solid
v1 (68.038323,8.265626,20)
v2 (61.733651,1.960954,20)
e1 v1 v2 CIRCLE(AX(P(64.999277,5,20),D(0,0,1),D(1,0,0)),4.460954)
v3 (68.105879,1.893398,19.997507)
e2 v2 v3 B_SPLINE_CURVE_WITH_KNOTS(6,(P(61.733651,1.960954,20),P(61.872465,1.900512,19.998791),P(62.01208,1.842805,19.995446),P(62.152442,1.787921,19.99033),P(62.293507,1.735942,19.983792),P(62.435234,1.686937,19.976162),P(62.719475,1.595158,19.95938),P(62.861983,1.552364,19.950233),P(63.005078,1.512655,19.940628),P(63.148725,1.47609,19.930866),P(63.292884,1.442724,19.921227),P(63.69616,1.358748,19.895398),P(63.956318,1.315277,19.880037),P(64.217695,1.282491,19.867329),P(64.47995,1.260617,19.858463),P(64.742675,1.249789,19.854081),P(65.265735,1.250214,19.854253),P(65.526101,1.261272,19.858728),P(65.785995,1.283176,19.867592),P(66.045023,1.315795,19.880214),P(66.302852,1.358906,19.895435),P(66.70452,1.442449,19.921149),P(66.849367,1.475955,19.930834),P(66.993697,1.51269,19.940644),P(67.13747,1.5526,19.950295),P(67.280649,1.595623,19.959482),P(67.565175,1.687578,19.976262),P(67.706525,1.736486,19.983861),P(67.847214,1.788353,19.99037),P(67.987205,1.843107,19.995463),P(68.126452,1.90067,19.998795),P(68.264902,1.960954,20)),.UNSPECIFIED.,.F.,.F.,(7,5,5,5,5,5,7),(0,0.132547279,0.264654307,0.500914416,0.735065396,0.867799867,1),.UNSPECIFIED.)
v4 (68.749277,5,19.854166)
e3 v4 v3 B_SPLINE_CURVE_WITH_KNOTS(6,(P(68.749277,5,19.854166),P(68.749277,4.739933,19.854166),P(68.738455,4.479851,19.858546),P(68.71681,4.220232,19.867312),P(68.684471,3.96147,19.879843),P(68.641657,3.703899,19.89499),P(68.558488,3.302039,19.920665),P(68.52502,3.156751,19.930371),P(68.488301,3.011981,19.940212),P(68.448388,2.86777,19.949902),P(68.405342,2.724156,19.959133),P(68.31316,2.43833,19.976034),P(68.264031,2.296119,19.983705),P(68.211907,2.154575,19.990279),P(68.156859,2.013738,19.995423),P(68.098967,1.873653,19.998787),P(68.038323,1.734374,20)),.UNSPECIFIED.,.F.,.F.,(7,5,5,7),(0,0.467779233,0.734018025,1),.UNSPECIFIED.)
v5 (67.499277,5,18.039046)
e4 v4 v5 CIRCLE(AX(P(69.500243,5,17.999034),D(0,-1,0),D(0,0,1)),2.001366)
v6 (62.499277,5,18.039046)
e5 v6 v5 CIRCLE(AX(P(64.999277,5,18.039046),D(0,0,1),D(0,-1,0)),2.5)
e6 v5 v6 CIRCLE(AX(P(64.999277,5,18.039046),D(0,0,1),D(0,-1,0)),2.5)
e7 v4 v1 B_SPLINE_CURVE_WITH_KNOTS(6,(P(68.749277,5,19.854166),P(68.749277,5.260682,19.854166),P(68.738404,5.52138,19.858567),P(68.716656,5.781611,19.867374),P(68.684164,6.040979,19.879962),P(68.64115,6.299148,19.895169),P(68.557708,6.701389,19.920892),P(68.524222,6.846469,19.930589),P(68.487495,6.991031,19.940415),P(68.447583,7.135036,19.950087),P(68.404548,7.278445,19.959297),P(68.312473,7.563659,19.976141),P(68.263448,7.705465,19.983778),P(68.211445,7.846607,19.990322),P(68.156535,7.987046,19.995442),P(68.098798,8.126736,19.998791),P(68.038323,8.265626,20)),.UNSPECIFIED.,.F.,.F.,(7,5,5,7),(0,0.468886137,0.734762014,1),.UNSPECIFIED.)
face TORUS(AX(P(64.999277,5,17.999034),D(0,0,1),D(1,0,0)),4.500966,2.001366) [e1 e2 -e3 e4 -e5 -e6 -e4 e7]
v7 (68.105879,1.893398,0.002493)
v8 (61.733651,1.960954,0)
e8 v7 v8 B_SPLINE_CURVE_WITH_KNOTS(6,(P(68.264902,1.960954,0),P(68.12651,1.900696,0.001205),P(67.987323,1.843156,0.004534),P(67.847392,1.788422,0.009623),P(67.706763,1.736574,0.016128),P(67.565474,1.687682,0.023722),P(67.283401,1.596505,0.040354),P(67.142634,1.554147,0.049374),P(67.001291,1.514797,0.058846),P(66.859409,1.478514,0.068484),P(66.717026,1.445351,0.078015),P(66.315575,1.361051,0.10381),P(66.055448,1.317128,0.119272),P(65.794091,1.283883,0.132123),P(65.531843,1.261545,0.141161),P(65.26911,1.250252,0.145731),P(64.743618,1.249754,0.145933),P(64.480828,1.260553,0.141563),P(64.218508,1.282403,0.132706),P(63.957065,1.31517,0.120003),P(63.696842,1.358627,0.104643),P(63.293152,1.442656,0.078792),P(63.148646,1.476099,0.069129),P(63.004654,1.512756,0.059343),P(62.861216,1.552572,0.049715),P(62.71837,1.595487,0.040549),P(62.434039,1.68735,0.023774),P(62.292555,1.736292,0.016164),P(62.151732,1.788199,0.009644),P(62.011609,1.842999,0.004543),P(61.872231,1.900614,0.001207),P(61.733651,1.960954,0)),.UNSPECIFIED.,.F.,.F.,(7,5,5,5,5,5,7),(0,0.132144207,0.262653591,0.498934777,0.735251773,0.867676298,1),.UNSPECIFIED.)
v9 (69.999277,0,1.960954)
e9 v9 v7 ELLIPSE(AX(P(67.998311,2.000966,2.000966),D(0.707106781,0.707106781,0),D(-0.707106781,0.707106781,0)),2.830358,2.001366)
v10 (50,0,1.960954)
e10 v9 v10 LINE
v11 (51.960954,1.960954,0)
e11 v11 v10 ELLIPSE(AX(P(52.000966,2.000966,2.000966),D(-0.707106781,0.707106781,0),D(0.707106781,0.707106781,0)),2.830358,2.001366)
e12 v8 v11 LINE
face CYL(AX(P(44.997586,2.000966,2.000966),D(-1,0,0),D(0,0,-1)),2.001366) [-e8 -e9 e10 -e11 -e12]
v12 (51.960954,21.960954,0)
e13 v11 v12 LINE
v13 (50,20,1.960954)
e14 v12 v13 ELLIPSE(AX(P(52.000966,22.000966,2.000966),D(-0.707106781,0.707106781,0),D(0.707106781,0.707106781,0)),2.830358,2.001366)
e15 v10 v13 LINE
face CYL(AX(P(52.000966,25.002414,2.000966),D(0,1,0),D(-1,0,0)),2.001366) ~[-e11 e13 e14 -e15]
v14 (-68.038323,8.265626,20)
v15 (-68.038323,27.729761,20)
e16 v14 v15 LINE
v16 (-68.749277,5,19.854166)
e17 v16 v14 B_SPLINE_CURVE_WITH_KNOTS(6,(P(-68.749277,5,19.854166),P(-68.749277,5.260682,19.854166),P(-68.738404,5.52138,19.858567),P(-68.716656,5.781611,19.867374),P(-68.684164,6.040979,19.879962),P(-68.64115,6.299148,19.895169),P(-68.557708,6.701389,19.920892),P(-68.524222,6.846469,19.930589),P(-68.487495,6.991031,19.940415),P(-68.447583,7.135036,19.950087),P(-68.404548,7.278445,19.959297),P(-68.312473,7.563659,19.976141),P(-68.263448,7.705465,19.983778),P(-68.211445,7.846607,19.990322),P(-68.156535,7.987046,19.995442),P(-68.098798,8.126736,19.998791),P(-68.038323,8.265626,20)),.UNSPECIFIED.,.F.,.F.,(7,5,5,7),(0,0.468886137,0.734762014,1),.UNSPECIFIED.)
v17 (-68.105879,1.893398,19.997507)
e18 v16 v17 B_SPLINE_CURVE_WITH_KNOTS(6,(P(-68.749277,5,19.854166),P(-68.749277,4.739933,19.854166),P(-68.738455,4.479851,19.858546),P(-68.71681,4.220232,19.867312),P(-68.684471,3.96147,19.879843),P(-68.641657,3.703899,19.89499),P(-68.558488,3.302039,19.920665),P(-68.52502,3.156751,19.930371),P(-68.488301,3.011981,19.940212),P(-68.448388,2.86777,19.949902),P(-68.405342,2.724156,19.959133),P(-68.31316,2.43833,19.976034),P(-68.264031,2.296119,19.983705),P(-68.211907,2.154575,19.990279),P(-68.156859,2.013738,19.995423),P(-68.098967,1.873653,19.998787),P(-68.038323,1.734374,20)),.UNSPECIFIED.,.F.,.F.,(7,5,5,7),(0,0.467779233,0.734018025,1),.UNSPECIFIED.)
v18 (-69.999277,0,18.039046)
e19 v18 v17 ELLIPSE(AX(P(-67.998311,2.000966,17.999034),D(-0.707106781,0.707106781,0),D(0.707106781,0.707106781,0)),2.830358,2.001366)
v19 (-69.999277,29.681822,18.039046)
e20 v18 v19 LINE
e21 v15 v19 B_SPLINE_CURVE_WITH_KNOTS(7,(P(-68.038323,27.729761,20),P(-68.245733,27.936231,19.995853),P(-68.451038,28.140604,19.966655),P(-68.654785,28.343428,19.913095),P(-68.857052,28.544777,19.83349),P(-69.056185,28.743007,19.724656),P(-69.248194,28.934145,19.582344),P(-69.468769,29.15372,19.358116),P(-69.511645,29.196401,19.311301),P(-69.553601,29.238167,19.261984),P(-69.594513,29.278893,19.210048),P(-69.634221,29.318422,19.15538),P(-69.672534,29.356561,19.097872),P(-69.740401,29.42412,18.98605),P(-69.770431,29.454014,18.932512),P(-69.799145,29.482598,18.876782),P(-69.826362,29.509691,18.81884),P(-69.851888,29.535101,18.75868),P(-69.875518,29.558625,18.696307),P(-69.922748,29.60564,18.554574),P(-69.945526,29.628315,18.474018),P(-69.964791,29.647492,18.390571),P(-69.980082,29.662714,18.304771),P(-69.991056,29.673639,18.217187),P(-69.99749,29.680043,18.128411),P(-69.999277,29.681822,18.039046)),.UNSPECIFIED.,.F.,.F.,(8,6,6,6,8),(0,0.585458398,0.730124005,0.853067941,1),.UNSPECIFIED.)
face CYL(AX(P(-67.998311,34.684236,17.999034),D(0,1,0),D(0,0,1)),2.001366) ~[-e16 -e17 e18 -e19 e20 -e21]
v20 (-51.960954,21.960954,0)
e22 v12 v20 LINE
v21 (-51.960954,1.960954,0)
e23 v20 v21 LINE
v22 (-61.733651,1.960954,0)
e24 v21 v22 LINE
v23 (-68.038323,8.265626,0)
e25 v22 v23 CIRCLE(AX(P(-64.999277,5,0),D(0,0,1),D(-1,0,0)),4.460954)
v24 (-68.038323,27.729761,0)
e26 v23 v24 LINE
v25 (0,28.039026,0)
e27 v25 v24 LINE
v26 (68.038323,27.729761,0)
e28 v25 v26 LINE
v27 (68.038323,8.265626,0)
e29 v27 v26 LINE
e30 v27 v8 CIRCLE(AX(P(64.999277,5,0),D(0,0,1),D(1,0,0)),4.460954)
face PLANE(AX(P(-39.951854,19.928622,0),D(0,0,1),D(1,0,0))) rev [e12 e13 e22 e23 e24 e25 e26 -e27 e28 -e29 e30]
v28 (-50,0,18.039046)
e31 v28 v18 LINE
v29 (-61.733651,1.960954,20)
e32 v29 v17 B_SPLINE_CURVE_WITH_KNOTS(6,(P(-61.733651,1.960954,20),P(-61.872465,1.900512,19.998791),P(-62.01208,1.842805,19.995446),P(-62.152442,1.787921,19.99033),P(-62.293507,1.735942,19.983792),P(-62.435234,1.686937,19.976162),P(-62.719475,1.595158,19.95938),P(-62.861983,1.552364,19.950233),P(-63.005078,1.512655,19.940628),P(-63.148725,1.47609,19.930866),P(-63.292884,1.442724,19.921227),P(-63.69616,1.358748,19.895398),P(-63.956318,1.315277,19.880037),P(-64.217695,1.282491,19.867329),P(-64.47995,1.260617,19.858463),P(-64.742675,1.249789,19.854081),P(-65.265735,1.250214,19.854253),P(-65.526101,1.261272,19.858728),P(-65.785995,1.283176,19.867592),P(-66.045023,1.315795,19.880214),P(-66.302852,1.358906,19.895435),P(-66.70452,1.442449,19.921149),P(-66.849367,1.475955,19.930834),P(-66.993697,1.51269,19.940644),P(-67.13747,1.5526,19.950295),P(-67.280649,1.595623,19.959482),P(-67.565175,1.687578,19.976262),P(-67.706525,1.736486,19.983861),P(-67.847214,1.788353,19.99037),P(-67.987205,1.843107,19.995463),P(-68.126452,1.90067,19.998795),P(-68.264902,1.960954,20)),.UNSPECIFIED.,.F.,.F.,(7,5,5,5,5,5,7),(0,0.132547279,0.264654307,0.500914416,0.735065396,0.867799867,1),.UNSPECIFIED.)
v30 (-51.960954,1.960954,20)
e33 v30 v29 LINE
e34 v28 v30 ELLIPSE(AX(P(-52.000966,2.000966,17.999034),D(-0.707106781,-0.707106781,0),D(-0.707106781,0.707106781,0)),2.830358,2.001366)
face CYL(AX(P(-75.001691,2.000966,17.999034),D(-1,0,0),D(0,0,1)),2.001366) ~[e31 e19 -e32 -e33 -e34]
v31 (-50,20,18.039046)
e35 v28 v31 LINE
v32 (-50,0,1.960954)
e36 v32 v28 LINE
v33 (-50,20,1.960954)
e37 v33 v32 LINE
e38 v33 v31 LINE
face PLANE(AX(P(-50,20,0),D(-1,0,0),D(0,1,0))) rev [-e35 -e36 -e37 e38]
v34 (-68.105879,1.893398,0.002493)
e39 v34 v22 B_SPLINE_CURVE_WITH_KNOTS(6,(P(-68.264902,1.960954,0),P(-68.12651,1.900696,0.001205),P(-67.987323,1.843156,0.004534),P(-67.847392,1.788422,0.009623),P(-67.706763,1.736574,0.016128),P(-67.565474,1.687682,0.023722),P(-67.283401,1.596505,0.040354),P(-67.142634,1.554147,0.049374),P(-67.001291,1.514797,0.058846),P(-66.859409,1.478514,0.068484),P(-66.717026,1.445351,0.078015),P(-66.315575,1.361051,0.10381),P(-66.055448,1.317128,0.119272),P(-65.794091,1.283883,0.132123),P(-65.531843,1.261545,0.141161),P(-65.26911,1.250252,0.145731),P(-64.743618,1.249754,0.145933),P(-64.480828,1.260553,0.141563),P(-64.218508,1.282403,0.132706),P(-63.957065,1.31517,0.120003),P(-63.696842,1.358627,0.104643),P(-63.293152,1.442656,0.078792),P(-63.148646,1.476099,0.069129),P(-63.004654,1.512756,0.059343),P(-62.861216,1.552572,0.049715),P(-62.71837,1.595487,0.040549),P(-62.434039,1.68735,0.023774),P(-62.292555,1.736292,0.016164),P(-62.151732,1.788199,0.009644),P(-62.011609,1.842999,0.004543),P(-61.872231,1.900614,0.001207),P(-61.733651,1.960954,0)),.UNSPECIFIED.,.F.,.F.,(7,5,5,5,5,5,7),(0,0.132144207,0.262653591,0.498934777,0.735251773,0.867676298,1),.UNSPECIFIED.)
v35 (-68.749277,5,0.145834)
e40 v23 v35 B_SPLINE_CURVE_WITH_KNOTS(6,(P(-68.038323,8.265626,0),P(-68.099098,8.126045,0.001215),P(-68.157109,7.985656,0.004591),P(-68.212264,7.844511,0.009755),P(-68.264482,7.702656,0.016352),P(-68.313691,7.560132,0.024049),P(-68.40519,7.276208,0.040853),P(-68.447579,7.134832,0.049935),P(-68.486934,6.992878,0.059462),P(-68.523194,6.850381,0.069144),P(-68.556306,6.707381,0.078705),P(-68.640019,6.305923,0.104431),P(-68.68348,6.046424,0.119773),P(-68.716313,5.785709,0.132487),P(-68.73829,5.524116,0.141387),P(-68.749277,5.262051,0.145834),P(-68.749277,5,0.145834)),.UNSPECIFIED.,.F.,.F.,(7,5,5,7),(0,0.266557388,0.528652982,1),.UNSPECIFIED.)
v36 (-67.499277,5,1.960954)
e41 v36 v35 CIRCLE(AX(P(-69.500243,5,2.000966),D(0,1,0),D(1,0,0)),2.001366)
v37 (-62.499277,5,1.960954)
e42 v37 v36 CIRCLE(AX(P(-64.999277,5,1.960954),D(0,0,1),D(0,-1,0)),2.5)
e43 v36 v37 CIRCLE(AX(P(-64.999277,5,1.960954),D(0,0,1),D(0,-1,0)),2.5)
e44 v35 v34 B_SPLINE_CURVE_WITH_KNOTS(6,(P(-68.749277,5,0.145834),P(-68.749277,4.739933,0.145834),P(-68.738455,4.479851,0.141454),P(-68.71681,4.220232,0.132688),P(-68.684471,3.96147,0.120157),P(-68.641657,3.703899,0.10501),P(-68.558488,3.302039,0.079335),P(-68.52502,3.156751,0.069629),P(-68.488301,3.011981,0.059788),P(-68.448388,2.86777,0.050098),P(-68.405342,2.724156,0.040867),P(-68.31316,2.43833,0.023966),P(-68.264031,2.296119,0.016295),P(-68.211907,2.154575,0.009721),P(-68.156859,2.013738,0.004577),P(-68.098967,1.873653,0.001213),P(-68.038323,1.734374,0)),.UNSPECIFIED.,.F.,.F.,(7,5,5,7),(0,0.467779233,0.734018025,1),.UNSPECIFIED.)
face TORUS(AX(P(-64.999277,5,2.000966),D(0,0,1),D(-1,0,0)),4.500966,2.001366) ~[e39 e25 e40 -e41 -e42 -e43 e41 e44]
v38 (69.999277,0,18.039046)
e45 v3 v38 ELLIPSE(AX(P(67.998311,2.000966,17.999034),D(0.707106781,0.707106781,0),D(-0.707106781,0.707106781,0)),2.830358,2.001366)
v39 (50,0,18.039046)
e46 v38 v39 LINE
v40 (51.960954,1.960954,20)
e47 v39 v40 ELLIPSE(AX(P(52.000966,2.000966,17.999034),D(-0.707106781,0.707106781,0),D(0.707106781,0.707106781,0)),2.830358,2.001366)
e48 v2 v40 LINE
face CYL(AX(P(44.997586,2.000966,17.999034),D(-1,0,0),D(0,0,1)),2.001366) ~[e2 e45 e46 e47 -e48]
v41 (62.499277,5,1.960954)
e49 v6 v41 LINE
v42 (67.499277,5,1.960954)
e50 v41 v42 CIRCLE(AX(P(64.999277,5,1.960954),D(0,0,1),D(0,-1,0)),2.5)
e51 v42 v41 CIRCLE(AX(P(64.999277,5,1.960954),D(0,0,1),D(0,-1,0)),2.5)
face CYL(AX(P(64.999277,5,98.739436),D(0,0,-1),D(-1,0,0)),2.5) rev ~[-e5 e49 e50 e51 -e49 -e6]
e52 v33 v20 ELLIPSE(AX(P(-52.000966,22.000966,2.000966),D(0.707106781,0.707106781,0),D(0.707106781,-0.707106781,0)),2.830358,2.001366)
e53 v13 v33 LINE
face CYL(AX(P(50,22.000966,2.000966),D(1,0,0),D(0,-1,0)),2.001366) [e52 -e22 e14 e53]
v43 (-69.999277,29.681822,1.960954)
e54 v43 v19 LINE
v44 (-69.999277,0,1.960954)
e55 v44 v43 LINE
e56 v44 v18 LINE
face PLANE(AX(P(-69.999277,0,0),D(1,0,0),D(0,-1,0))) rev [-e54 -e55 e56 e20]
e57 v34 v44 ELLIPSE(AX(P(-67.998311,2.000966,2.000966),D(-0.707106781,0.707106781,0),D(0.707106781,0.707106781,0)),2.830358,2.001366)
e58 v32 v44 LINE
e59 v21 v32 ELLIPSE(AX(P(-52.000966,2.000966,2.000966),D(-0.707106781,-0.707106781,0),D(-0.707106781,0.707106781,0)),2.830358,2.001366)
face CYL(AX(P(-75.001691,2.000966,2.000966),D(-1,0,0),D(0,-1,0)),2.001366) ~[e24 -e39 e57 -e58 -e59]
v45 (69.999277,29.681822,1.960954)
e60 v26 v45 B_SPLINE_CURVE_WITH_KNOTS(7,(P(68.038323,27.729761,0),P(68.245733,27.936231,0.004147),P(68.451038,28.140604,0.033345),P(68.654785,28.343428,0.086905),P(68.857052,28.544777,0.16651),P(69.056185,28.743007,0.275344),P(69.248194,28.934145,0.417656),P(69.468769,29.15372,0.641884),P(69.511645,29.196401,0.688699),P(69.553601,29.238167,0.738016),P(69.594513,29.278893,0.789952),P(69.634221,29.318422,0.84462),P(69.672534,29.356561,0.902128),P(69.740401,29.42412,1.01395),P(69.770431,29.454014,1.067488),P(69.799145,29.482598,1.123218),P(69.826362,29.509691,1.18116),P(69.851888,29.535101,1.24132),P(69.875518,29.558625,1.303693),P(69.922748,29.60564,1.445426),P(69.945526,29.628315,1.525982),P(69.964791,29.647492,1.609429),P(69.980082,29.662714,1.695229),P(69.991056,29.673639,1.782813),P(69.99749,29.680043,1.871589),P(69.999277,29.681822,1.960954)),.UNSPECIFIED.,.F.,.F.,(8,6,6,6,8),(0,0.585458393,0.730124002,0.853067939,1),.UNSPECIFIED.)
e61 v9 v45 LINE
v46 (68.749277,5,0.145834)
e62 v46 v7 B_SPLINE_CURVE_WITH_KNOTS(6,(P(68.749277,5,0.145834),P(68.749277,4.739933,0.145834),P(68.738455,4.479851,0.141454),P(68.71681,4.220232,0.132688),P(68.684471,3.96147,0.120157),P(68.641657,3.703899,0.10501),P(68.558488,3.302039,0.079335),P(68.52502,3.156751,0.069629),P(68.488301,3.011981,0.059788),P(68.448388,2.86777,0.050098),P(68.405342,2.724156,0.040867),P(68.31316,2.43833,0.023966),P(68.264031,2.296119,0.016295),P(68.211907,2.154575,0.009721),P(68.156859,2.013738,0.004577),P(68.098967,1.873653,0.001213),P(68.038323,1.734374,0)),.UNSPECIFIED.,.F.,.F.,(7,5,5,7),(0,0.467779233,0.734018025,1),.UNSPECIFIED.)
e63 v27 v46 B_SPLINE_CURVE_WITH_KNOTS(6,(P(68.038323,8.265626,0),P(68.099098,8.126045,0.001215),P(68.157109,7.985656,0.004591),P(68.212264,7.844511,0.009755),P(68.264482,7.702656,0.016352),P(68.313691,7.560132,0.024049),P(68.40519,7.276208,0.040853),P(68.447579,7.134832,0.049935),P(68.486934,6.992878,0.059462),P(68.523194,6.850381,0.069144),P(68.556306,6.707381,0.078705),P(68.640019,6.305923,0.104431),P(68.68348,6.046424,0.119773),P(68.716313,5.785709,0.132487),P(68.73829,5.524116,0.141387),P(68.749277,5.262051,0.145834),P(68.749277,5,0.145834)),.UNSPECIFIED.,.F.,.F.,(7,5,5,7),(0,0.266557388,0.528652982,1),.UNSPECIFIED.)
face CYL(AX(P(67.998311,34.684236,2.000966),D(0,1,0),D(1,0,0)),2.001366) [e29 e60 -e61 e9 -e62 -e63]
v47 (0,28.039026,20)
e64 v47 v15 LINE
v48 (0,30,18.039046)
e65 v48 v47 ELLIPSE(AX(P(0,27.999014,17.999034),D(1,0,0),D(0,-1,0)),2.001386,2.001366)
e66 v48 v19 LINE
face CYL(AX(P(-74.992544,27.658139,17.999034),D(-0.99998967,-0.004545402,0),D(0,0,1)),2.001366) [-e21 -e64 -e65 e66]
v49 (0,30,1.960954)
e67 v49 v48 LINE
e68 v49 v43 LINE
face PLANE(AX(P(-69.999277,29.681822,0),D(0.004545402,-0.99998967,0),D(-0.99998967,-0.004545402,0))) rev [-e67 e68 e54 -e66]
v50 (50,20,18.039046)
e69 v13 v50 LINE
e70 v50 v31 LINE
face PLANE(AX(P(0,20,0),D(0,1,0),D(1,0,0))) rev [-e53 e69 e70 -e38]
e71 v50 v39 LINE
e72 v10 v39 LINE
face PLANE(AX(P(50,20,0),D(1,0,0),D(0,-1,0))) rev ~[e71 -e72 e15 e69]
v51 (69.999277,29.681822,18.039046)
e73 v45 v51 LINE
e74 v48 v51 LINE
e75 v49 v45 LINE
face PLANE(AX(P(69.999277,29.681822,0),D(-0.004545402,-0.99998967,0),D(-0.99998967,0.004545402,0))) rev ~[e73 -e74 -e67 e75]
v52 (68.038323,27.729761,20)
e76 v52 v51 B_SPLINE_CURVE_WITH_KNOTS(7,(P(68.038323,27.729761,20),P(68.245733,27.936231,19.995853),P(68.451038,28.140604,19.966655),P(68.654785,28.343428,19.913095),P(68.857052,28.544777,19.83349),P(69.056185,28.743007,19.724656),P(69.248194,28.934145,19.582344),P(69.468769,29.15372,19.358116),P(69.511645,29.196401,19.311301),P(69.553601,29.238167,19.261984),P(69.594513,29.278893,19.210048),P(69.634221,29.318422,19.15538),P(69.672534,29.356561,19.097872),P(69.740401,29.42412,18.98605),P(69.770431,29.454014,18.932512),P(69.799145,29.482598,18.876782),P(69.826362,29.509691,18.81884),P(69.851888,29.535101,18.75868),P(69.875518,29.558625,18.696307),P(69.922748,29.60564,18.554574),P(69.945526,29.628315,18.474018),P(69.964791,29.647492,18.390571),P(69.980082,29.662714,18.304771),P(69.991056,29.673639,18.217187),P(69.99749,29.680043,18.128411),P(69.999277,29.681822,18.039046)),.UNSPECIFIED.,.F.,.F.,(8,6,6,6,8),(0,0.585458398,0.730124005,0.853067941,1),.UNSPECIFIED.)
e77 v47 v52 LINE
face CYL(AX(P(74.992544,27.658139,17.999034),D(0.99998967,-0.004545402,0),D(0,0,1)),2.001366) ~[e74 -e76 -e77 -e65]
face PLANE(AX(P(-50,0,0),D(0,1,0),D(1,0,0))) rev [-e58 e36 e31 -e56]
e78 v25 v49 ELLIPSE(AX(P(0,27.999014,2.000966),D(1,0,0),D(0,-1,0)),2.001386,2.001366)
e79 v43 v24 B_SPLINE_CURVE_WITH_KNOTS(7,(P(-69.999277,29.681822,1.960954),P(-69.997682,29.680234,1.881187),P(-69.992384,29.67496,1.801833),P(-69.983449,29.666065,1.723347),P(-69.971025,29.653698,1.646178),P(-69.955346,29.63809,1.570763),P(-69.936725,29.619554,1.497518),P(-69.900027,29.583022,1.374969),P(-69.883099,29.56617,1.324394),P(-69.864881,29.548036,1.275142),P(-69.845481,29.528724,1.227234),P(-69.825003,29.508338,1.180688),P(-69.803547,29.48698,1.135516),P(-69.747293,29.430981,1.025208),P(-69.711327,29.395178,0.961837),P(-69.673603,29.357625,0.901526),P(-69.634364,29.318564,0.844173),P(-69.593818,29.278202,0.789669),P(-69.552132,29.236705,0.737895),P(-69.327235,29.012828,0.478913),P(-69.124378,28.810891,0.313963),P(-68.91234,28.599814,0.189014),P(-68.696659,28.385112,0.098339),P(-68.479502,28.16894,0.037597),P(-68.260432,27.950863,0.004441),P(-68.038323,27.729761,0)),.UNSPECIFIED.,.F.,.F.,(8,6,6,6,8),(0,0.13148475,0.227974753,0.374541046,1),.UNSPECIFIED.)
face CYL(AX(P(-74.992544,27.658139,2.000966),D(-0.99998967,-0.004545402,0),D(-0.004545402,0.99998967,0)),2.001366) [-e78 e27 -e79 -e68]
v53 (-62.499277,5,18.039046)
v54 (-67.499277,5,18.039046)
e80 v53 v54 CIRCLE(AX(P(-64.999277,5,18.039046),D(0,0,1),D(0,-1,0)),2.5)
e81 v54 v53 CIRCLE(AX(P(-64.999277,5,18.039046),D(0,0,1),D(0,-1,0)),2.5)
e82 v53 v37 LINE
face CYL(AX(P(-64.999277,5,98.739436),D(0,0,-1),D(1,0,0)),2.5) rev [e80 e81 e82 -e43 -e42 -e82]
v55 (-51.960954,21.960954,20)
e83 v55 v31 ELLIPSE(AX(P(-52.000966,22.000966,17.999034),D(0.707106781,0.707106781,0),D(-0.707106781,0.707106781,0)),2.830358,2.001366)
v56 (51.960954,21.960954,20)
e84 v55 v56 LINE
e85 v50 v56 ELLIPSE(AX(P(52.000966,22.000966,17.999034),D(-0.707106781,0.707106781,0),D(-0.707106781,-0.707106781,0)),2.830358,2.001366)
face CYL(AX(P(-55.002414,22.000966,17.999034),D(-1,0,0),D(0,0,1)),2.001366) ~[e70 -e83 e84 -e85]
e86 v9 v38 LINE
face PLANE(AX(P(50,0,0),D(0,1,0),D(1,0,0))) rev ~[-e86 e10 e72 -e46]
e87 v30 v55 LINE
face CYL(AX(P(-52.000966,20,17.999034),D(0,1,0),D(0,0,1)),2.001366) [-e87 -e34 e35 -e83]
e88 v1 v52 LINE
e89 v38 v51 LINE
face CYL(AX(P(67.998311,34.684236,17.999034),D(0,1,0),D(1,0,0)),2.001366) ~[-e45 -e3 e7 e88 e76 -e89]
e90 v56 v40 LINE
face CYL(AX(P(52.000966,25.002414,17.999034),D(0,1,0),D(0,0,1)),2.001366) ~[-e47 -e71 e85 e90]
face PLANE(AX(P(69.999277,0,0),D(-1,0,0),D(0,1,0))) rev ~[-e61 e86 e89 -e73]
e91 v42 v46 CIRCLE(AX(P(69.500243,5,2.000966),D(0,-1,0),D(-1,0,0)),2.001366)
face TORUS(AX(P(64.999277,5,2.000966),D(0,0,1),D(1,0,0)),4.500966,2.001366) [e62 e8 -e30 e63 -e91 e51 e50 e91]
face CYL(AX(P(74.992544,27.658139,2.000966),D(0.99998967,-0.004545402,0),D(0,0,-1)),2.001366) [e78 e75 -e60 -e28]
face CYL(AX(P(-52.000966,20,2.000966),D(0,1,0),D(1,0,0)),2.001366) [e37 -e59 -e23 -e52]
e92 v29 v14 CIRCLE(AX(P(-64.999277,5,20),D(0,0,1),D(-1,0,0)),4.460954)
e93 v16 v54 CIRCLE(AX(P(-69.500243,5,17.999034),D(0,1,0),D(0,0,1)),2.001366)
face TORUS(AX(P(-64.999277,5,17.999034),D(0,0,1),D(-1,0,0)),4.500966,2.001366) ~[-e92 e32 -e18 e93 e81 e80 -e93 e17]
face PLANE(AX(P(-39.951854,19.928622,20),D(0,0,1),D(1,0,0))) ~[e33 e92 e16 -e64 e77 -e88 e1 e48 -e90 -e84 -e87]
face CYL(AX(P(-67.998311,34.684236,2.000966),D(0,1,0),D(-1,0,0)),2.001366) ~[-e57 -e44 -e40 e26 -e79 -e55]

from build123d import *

# Parameters (mm, degrees)
F1_DEPTH     = 20
F3_D         = 5
F5_T1_DEPTH  = 39.6866504653
F5_T3_DEPTH  = 75.0024143135
F5_T5_DEPTH  = 75.0024143135
F5_T7_DEPTH  = 30.0041054994
F5_T9_DEPTH  = 25.0024143135
F5_T11_DEPTH = 100
F5_T13_DEPTH = 30.0041054994
F5_T27_DEPTH = 30.004828627
F5_T31_DEPTH = 105.0024143135
F5_T38_DEPTH = 105.0024143135
F5_T42_DEPTH = 30.004828627
F5_T49_DEPTH = 105.0024143135
F5_T53_DEPTH = 30.004828627
F5_T60_DEPTH = 30.004828627
F5_T64_DEPTH = 105.0024143135


# Not quite as in the source:
# - a fillet or chamfer that OpenCascade refuses, or shapes differently, is made with other operations: its cross-section is extruded or revolved along the edge and cut away or added


with BuildPart() as f1:
    # F0 (on Top) → F1 (new body)
    with BuildSketch(Plane.XY):
        Polygon((69.9992768724, 29.6818218383), (0, 30), (0, 20), (50, 20), (50, 0), (69.9992768724, 0), align=None)
    extrude(amount=F1_DEPTH)

    # F3 (through all)
    with Locations(Plane.XY.offset(20)):
        with Locations((64.9992768724, 5)):
            Hole(F3_D / 2)

    # F4: F1 across face


with BuildPart() as f1_1:
    add(f1.part)
    add(f1.part.mirror(Plane(origin=(0, 25, 10), x_dir=(0, -1, 0), z_dir=(-1, 0, 0))))

    # F5: fillet of radius 2 on 22 edges, made by hand

    # F5_s2 → F5_t1 (cut)
    with BuildSketch(Plane.XZ.offset(-34.6842361518)):
        with BuildLine():
            ThreePointArc((69.9996768724, 17.9990343146), (69.4134904348, 19.4142135624), (67.998311187, 20.0004))
            Line((67.998311187, 20.0004), (67.998311187, 20.2005365685))
            ThreePointArc((67.998311187, 20.2005365685), (68.9987940297, 20.2001365685), (69.9992768724, 20.2001365685))
            Line((69.9992768724, 20.2001365685), (70.1994134409, 20))
            ThreePointArc((70.1994134409, 20), (70.1994134409, 18.9995171573), (70.1998134409, 17.9990343146))
            Line((70.1998134409, 17.9990343146), (69.9996768724, 17.9990343146))
        make_face()
        with BuildLine():
            ThreePointArc((-67.998311187, 20.0004), (-69.4134904348, 19.4142135624), (-69.9996768724, 17.9990343146))
            Line((-69.9996768724, 17.9990343146), (-70.1998134409, 17.9990343146))
            ThreePointArc((-70.1998134409, 17.9990343146), (-70.1994134409, 18.9995171573), (-70.1994134409, 20))
            Line((-70.1994134409, 20), (-69.9992768724, 20.2001365685))
            ThreePointArc((-69.9992768724, 20.2001365685), (-68.9987940297, 20.2001365685), (-67.998311187, 20.2005365685))
            Line((-67.998311187, 20.2005365685), (-67.998311187, 20.0004))
        make_face()
        with BuildLine():
            ThreePointArc((69.9996768724, 2.0009656854), (69.4134904348, 0.5857864376), (67.998311187, -0.0004))
            Line((67.998311187, -0.0004), (67.998311187, -0.2005365685))
            ThreePointArc((67.998311187, -0.2005365685), (68.9987940297, -0.2001365685), (69.9992768724, -0.2001365685))
            Line((69.9992768724, -0.2001365685), (70.1994134409, 0))
            ThreePointArc((70.1994134409, 0), (70.1994134409, 1.0004828427), (70.1998134409, 2.0009656854))
            Line((70.1998134409, 2.0009656854), (69.9996768724, 2.0009656854))
        make_face()
        with BuildLine():
            ThreePointArc((-69.9996768724, 2.0009656854), (-69.4134904348, 0.5857864376), (-67.998311187, -0.0004))
            Line((-67.998311187, -0.0004), (-67.998311187, -0.2005365685))
            ThreePointArc((-67.998311187, -0.2005365685), (-68.9987940297, -0.2001365685), (-69.9992768724, -0.2001365685))
            Line((-69.9992768724, -0.2001365685), (-70.1994134409, 0))
            ThreePointArc((-70.1994134409, 0), (-70.1994134409, 1.0004828427), (-70.1998134409, 2.0009656854))
            Line((-70.1998134409, 2.0009656854), (-69.9996768724, 2.0009656854))
        make_face()
    extrude(amount=F5_T1_DEPTH, mode=Mode.SUBTRACT)

    # F5_s4 → F5_t3 (cut)
    with BuildSketch(Plane(origin=(74.8652788484, -0.3402963268, 0), x_dir=(0, 0, 1), z_dir=(-0.9999896696, 0.0045454023, 0))):
        with BuildLine():
            ThreePointArc((20.0004, 27.9987244027), (19.4142135624, 29.4139036505), (17.9990343146, 30.0000900882))
            Line((17.9990343146, 30.0000900882), (17.9990343146, 30.2002266567))
            ThreePointArc((17.9990343146, 30.2002266567), (18.9995171573, 30.1998266567), (20, 30.1998266567))
            Line((20, 30.1998266567), (20.2001365685, 29.9996900882))
            ThreePointArc((20.2001365685, 29.9996900882), (20.2001365685, 28.9992072455), (20.2005365685, 27.9987244027))
            Line((20.2005365685, 27.9987244027), (20.0004, 27.9987244027))
        make_face()
        with BuildLine():
            ThreePointArc((-0.0004, 27.9987244027), (0.5857864376, 29.4139036505), (2.0009656854, 30.0000900882))
            Line((2.0009656854, 30.0000900882), (2.0009656854, 30.2002266567))
            ThreePointArc((2.0009656854, 30.2002266567), (1.0004828427, 30.1998266567), (0, 30.1998266567))
            Line((0, 30.1998266567), (-0.2001365685, 29.9996900882))
            ThreePointArc((-0.2001365685, 29.9996900882), (-0.2001365685, 28.9992072455), (-0.2005365685, 27.9987244027))
            Line((-0.2005365685, 27.9987244027), (-0.0004, 27.9987244027))
        make_face()
    extrude(amount=F5_T3_DEPTH, mode=Mode.SUBTRACT)

    # F5_s6 → F5_t5 (cut)
    with BuildSketch(Plane(origin=(-74.8652788484, -0.3402963268, 0), x_dir=(0, 0, 1), z_dir=(0.9999896696, 0.0045454023, 0))):
        with BuildLine():
            ThreePointArc((20.0004, -27.9987244027), (19.4142135624, -29.4139036505), (17.9990343146, -30.0000900882))
            Line((17.9990343146, -30.0000900882), (17.9990343146, -30.2002266567))
            ThreePointArc((17.9990343146, -30.2002266567), (18.9995171573, -30.1998266567), (20, -30.1998266567))
            Line((20, -30.1998266567), (20.2001365685, -29.9996900882))
            ThreePointArc((20.2001365685, -29.9996900882), (20.2001365685, -28.9992072455), (20.2005365685, -27.9987244027))
            Line((20.2005365685, -27.9987244027), (20.0004, -27.9987244027))
        make_face()
        with BuildLine():
            ThreePointArc((2.0009656854, -30.0000900882), (0.5857864376, -29.4139036505), (-0.0004, -27.9987244027))
            Line((-0.0004, -27.9987244027), (-0.2005365685, -27.9987244027))
            ThreePointArc((-0.2005365685, -27.9987244027), (-0.2001365685, -28.9992072455), (-0.2001365685, -29.9996900882))
            Line((-0.2001365685, -29.9996900882), (0, -30.1998266567))
            ThreePointArc((0, -30.1998266567), (1.0004828427, -30.1998266567), (2.0009656854, -30.2002266567))
            Line((2.0009656854, -30.2002266567), (2.0009656854, -30.0000900882))
        make_face()
    extrude(amount=F5_T5_DEPTH, mode=Mode.SUBTRACT)

    # F5_s8 → F5_t7 (cut)
    with BuildSketch(Plane.YZ.offset(-75.0016911859)):
        with BuildLine():
            ThreePointArc((2.0009656854, 20.0004), (0.5857864376, 19.4142135624), (-0.0004, 17.9990343146))
            Line((-0.0004, 17.9990343146), (-0.2005365685, 17.9990343146))
            ThreePointArc((-0.2005365685, 17.9990343146), (-0.2001365685, 18.9995171573), (-0.2001365685, 20))
            Line((-0.2001365685, 20), (0, 20.2001365685))
            ThreePointArc((0, 20.2001365685), (1.0004828427, 20.2001365685), (2.0009656854, 20.2005365685))
            Line((2.0009656854, 20.2005365685), (2.0009656854, 20.0004))
        make_face()
        with BuildLine():
            ThreePointArc((-0.0004, 2.0009656854), (0.5857864376, 0.5857864376), (2.0009656854, -0.0004))
            Line((2.0009656854, -0.0004), (2.0009656854, -0.2005365685))
            ThreePointArc((2.0009656854, -0.2005365685), (1.0004828427, -0.2001365685), (0, -0.2001365685))
            Line((0, -0.2001365685), (-0.2001365685, 0))
            ThreePointArc((-0.2001365685, 0), (-0.2001365685, 1.0004828427), (-0.2005365685, 2.0009656854))
            Line((-0.2005365685, 2.0009656854), (-0.0004, 2.0009656854))
        make_face()
    extrude(amount=F5_T7_DEPTH, mode=Mode.SUBTRACT)

    # F5_s10 → F5_t9 (cut)
    with BuildSketch(Plane.XZ.offset(-20)):
        with BuildLine():
            ThreePointArc((-52.0009656854, 20.0004), (-50.5857864376, 19.4142135624), (-49.9996, 17.9990343146))
            Line((-49.9996, 17.9990343146), (-49.7994634315, 17.9990343146))
            ThreePointArc((-49.7994634315, 17.9990343146), (-49.7998634315, 18.9995171573), (-49.7998634315, 20))
            Line((-49.7998634315, 20), (-50, 20.2001365685))
            ThreePointArc((-50, 20.2001365685), (-51.0004828427, 20.2001365685), (-52.0009656854, 20.2005365685))
            Line((-52.0009656854, 20.2005365685), (-52.0009656854, 20.0004))
        make_face()
        with BuildLine():
            ThreePointArc((52.0009656854, 20.0004), (50.5857864376, 19.4142135624), (49.9996, 17.9990343146))
            Line((49.9996, 17.9990343146), (49.7994634315, 17.9990343146))
            ThreePointArc((49.7994634315, 17.9990343146), (49.7998634315, 18.9995171573), (49.7998634315, 20))
            Line((49.7998634315, 20), (50, 20.2001365685))
            ThreePointArc((50, 20.2001365685), (51.0004828427, 20.2001365685), (52.0009656854, 20.2005365685))
            Line((52.0009656854, 20.2005365685), (52.0009656854, 20.0004))
        make_face()
        with BuildLine():
            ThreePointArc((-49.9996, 2.0009656854), (-50.5857864376, 0.5857864376), (-52.0009656854, -0.0004))
            Line((-52.0009656854, -0.0004), (-52.0009656854, -0.2005365685))
            ThreePointArc((-52.0009656854, -0.2005365685), (-51.0004828427, -0.2001365685), (-50, -0.2001365685))
            Line((-50, -0.2001365685), (-49.7998634315, 0))
            ThreePointArc((-49.7998634315, 0), (-49.7998634315, 1.0004828427), (-49.7994634315, 2.0009656854))
            Line((-49.7994634315, 2.0009656854), (-49.9996, 2.0009656854))
        make_face()
        with BuildLine():
            ThreePointArc((49.9996, 2.0009656854), (50.5857864376, 0.5857864376), (52.0009656854, -0.0004))
            Line((52.0009656854, -0.0004), (52.0009656854, -0.2005365685))
            ThreePointArc((52.0009656854, -0.2005365685), (51.0004828427, -0.2001365685), (50, -0.2001365685))
            Line((50, -0.2001365685), (49.7998634315, 0))
            ThreePointArc((49.7998634315, 0), (49.7998634315, 1.0004828427), (49.7994634315, 2.0009656854))
            Line((49.7994634315, 2.0009656854), (49.9996, 2.0009656854))
        make_face()
    extrude(amount=F5_T9_DEPTH, mode=Mode.SUBTRACT)

    # F5_s12 → F5_t11 (cut)
    with BuildSketch(Plane.YZ.offset(-50)):
        with BuildLine():
            ThreePointArc((22.0009656854, 20.0004), (20.5857864376, 19.4142135624), (19.9996, 17.9990343146))
            Line((19.9996, 17.9990343146), (19.7994634315, 17.9990343146))
            ThreePointArc((19.7994634315, 17.9990343146), (19.7998634315, 18.9995171573), (19.7998634315, 20))
            Line((19.7998634315, 20), (20, 20.2001365685))
            ThreePointArc((20, 20.2001365685), (21.0004828427, 20.2001365685), (22.0009656854, 20.2005365685))
            Line((22.0009656854, 20.2005365685), (22.0009656854, 20.0004))
        make_face()
        with BuildLine():
            ThreePointArc((19.9996, 2.0009656854), (20.5857864376, 0.5857864376), (22.0009656854, -0.0004))
            Line((22.0009656854, -0.0004), (22.0009656854, -0.2005365685))
            ThreePointArc((22.0009656854, -0.2005365685), (21.0004828427, -0.2001365685), (20, -0.2001365685))
            Line((20, -0.2001365685), (19.7998634315, 0))
            ThreePointArc((19.7998634315, 0), (19.7998634315, 1.0004828427), (19.7994634315, 2.0009656854))
            Line((19.7994634315, 2.0009656854), (19.9996, 2.0009656854))
        make_face()
    extrude(amount=F5_T11_DEPTH, mode=Mode.SUBTRACT)

    # F5_s14 → F5_t13 (cut)
    with BuildSketch(Plane.YZ.offset(44.9975856865)):
        with BuildLine():
            ThreePointArc((2.0009656854, 20.0004), (0.5857864376, 19.4142135624), (-0.0004, 17.9990343146))
            Line((-0.0004, 17.9990343146), (-0.2005365685, 17.9990343146))
            ThreePointArc((-0.2005365685, 17.9990343146), (-0.2001365685, 18.9995171573), (-0.2001365685, 20))
            Line((-0.2001365685, 20), (0, 20.2001365685))
            ThreePointArc((0, 20.2001365685), (1.0004828427, 20.2001365685), (2.0009656854, 20.2005365685))
            Line((2.0009656854, 20.2005365685), (2.0009656854, 20.0004))
        make_face()
        with BuildLine():
            ThreePointArc((2.0009656854, -0.0004), (0.5857864376, 0.5857864376), (-0.0004, 2.0009656854))
            Line((-0.0004, 2.0009656854), (-0.2005365685, 2.0009656854))
            ThreePointArc((-0.2005365685, 2.0009656854), (-0.2001365685, 1.0004828427), (-0.2001365685, 0))
            Line((-0.2001365685, 0), (0, -0.2001365685))
            ThreePointArc((0, -0.2001365685), (1.0004828427, -0.2001365685), (2.0009656854, -0.2005365685))
            Line((2.0009656854, -0.2005365685), (2.0009656854, -0.0004))
        make_face()
    extrude(amount=F5_T13_DEPTH, mode=Mode.SUBTRACT)

    # F5_s15 → F5_t16 (revolve, cut)
    with BuildSketch(Plane.XZ.offset(-5)):
        with BuildLine():
            ThreePointArc((69.5002425578, 20.0004), (68.08506331, 19.4142135624), (67.4988768724, 17.9990343146))
            Line((67.4988768724, 17.9990343146), (67.2987403038, 17.9990343146))
            ThreePointArc((67.2987403038, 17.9990343146), (67.2991403038, 18.9995171573), (67.2991403038, 20))
            Line((67.2991403038, 20), (67.4992768724, 20.2001365685))
            ThreePointArc((67.4992768724, 20.2001365685), (68.4997597151, 20.2001365685), (69.5002425578, 20.2005365685))
            Line((69.5002425578, 20.2005365685), (69.5002425578, 20.0004))
        make_face()
    revolve(axis=Axis((64.9992768724, 5, 20), (0, 0, 1)), mode=Mode.SUBTRACT)

    # F5_s17 → F5_t18 (revolve, cut)
    with BuildSketch(Plane.XZ.offset(-5)):
        with BuildLine():
            ThreePointArc((-69.5002425578, 20.0004), (-68.08506331, 19.4142135624), (-67.4988768724, 17.9990343146))
            Line((-67.4988768724, 17.9990343146), (-67.2987403038, 17.9990343146))
            ThreePointArc((-67.2987403038, 17.9990343146), (-67.2991403038, 18.9995171573), (-67.2991403038, 20))
            Line((-67.2991403038, 20), (-67.4992768724, 20.2001365685))
            ThreePointArc((-67.4992768724, 20.2001365685), (-68.4997597151, 20.2001365685), (-69.5002425578, 20.2005365685))
            Line((-69.5002425578, 20.2005365685), (-69.5002425578, 20.0004))
        make_face()
    revolve(axis=Axis((-64.9992768724, 5, 20), (0, 0, -1)), mode=Mode.SUBTRACT)

    # F5_s19 → F5_t20 (revolve, cut)
    with BuildSketch(Plane.XZ.offset(-5)):
        with BuildLine():
            ThreePointArc((67.4988768724, 2.0009656854), (68.08506331, 0.5857864376), (69.5002425578, -0.0004))
            Line((69.5002425578, -0.0004), (69.5002425578, -0.2005365685))
            ThreePointArc((69.5002425578, -0.2005365685), (68.4997597151, -0.2001365685), (67.4992768724, -0.2001365685))
            Line((67.4992768724, -0.2001365685), (67.2991403038, 0))
            ThreePointArc((67.2991403038, 0), (67.2991403038, 1.0004828427), (67.2987403038, 2.0009656854))
            Line((67.2987403038, 2.0009656854), (67.4988768724, 2.0009656854))
        make_face()
    revolve(axis=Axis((64.9992768724, 5, 0), (0, 0, 1)), mode=Mode.SUBTRACT)

    # F5_s21 → F5_t22 (revolve, cut)
    with BuildSketch(Plane.XZ.offset(-5)):
        with BuildLine():
            ThreePointArc((-67.4988768724, 2.0009656854), (-68.08506331, 0.5857864376), (-69.5002425578, -0.0004))
            Line((-69.5002425578, -0.0004), (-69.5002425578, -0.2005365685))
            ThreePointArc((-69.5002425578, -0.2005365685), (-68.4997597151, -0.2001365685), (-67.4992768724, -0.2001365685))
            Line((-67.4992768724, -0.2001365685), (-67.2991403038, 0))
            ThreePointArc((-67.2991403038, 0), (-67.2991403038, 1.0004828427), (-67.2987403038, 2.0009656854))
            Line((-67.2987403038, 2.0009656854), (-67.4988768724, 2.0009656854))
        make_face()
    revolve(axis=Axis((-64.9992768724, 5, 0), (0, 0, -1)), mode=Mode.SUBTRACT)


with BuildPart() as f5_tool25:
    # F5_s26 → F5_t27 (new body)
    with BuildSketch(Plane.XZ.offset(-25.0024143135)):
        with BuildLine():
            ThreePointArc((-52.0009656854, 20.0004), (-50.5857864376, 19.4142135624), (-49.9996, 17.9990343146))
            Line((-49.9996, 17.9990343146), (-49.7994634315, 17.9990343146))
            ThreePointArc((-49.7994634315, 17.9990343146), (-49.7998634315, 18.9995171573), (-49.7998634315, 20))
            Line((-49.7998634315, 20), (-50, 20.2001365685))
            ThreePointArc((-50, 20.2001365685), (-51.0004828427, 20.2001365685), (-52.0009656854, 20.2005365685))
            Line((-52.0009656854, 20.2005365685), (-52.0009656854, 20.0004))
        make_face()
    extrude(amount=F5_T27_DEPTH)

    split(bisect_by=Plane.XZ.offset(-20), keep=Keep.BOTTOM)


with BuildPart() as f5_tool29:
    # F5_s30 → F5_t31 (new body)
    with BuildSketch(Plane.YZ.offset(-55.0024143135)):
        with BuildLine():
            ThreePointArc((22.0009656854, 20.0004), (20.5857864376, 19.4142135624), (19.9996, 17.9990343146))
            Line((19.9996, 17.9990343146), (19.7994634315, 17.9990343146))
            ThreePointArc((19.7994634315, 17.9990343146), (19.7998634315, 18.9995171573), (19.7998634315, 20))
            Line((19.7998634315, 20), (20, 20.2001365685))
            ThreePointArc((20, 20.2001365685), (21.0004828427, 20.2001365685), (22.0009656854, 20.2005365685))
            Line((22.0009656854, 20.2005365685), (22.0009656854, 20.0004))
        make_face()
    extrude(amount=F5_T31_DEPTH)

    split(bisect_by=Plane.YZ.offset(-50), keep=Keep.BOTTOM)


with BuildPart() as f5_tool25_1:
    add(f5_tool25.part)

    # F5_t33: intersect F5_tool29
    add(f5_tool29.part, mode=Mode.INTERSECT)


with BuildPart() as f1_2:
    add(f1_1.part)

    # F5_t23: cut F5_tool25
    add(f5_tool25_1.part, mode=Mode.SUBTRACT)


with BuildPart() as f5_tool36:
    # F5_s37 → F5_t38 (new body)
    with BuildSketch(Plane.YZ.offset(-50)):
        with BuildLine():
            ThreePointArc((22.0009656854, 20.0004), (20.5857864376, 19.4142135624), (19.9996, 17.9990343146))
            Line((19.9996, 17.9990343146), (19.7994634315, 17.9990343146))
            ThreePointArc((19.7994634315, 17.9990343146), (19.7998634315, 18.9995171573), (19.7998634315, 20))
            Line((19.7998634315, 20), (20, 20.2001365685))
            ThreePointArc((20, 20.2001365685), (21.0004828427, 20.2001365685), (22.0009656854, 20.2005365685))
            Line((22.0009656854, 20.2005365685), (22.0009656854, 20.0004))
        make_face()
    extrude(amount=F5_T38_DEPTH)

    split(bisect_by=Plane.YZ.offset(50), keep=Keep.TOP)


with BuildPart() as f5_tool40:
    # F5_s41 → F5_t42 (new body)
    with BuildSketch(Plane.XZ.offset(-25.0024143135)):
        with BuildLine():
            ThreePointArc((52.0009656854, 20.0004), (50.5857864376, 19.4142135624), (49.9996, 17.9990343146))
            Line((49.9996, 17.9990343146), (49.7994634315, 17.9990343146))
            ThreePointArc((49.7994634315, 17.9990343146), (49.7998634315, 18.9995171573), (49.7998634315, 20))
            Line((49.7998634315, 20), (50, 20.2001365685))
            ThreePointArc((50, 20.2001365685), (51.0004828427, 20.2001365685), (52.0009656854, 20.2005365685))
            Line((52.0009656854, 20.2005365685), (52.0009656854, 20.0004))
        make_face()
    extrude(amount=F5_T42_DEPTH)

    split(bisect_by=Plane.XZ.offset(-20), keep=Keep.BOTTOM)


with BuildPart() as f5_tool36_1:
    add(f5_tool36.part)

    # F5_t44: intersect F5_tool40
    add(f5_tool40.part, mode=Mode.INTERSECT)


with BuildPart() as f1_3:
    add(f1_2.part)

    # F5_t34: cut F5_tool36
    add(f5_tool36_1.part, mode=Mode.SUBTRACT)


with BuildPart() as f5_tool47:
    # F5_s48 → F5_t49 (new body)
    with BuildSketch(Plane.YZ.offset(50)):
        with BuildLine():
            ThreePointArc((19.9996, 2.0009656854), (20.5857864376, 0.5857864376), (22.0009656854, -0.0004))
            Line((22.0009656854, -0.0004), (22.0009656854, -0.2005365685))
            ThreePointArc((22.0009656854, -0.2005365685), (21.0004828427, -0.2001365685), (20, -0.2001365685))
            Line((20, -0.2001365685), (19.7998634315, 0))
            ThreePointArc((19.7998634315, 0), (19.7998634315, 1.0004828427), (19.7994634315, 2.0009656854))
            Line((19.7994634315, 2.0009656854), (19.9996, 2.0009656854))
        make_face()
    extrude(amount=-F5_T49_DEPTH)

    split(bisect_by=Plane.YZ.offset(-50), keep=Keep.BOTTOM)


with BuildPart() as f5_tool51:
    # F5_s52 → F5_t53 (new body)
    with BuildSketch(Plane.XZ.offset(-25.0024143135)):
        with BuildLine():
            ThreePointArc((-49.9996, 2.0009656854), (-50.5857864376, 0.5857864376), (-52.0009656854, -0.0004))
            Line((-52.0009656854, -0.0004), (-52.0009656854, -0.2005365685))
            ThreePointArc((-52.0009656854, -0.2005365685), (-51.0004828427, -0.2001365685), (-50, -0.2001365685))
            Line((-50, -0.2001365685), (-49.7998634315, 0))
            ThreePointArc((-49.7998634315, 0), (-49.7998634315, 1.0004828427), (-49.7994634315, 2.0009656854))
            Line((-49.7994634315, 2.0009656854), (-49.9996, 2.0009656854))
        make_face()
    extrude(amount=F5_T53_DEPTH)

    split(bisect_by=Plane.XZ.offset(-20), keep=Keep.BOTTOM)


with BuildPart() as f5_tool47_1:
    add(f5_tool47.part)

    # F5_t55: intersect F5_tool51
    add(f5_tool51.part, mode=Mode.INTERSECT)


with BuildPart() as f1_4:
    add(f1_3.part)

    # F5_t45: cut F5_tool47
    add(f5_tool47_1.part, mode=Mode.SUBTRACT)


with BuildPart() as f5_tool58:
    # F5_s59 → F5_t60 (new body)
    with BuildSketch(Plane.XZ.offset(-25.0024143135)):
        with BuildLine():
            ThreePointArc((49.9996, 2.0009656854), (50.5857864376, 0.5857864376), (52.0009656854, -0.0004))
            Line((52.0009656854, -0.0004), (52.0009656854, -0.2005365685))
            ThreePointArc((52.0009656854, -0.2005365685), (51.0004828427, -0.2001365685), (50, -0.2001365685))
            Line((50, -0.2001365685), (49.7998634315, 0))
            ThreePointArc((49.7998634315, 0), (49.7998634315, 1.0004828427), (49.7994634315, 2.0009656854))
            Line((49.7994634315, 2.0009656854), (49.9996, 2.0009656854))
        make_face()
    extrude(amount=F5_T60_DEPTH)

    split(bisect_by=Plane.XZ.offset(-20), keep=Keep.BOTTOM)


with BuildPart() as f5_tool62:
    # F5_s63 → F5_t64 (new body)
    with BuildSketch(Plane.YZ.offset(55.0024143135)):
        with BuildLine():
            ThreePointArc((19.9996, 2.0009656854), (20.5857864376, 0.5857864376), (22.0009656854, -0.0004))
            Line((22.0009656854, -0.0004), (22.0009656854, -0.2005365685))
            ThreePointArc((22.0009656854, -0.2005365685), (21.0004828427, -0.2001365685), (20, -0.2001365685))
            Line((20, -0.2001365685), (19.7998634315, 0))
            ThreePointArc((19.7998634315, 0), (19.7998634315, 1.0004828427), (19.7994634315, 2.0009656854))
            Line((19.7994634315, 2.0009656854), (19.9996, 2.0009656854))
        make_face()
    extrude(amount=-F5_T64_DEPTH)

    split(bisect_by=Plane.YZ.offset(50), keep=Keep.TOP)


with BuildPart() as f5_tool58_1:
    add(f5_tool58.part)

    # F5_t66: intersect F5_tool62
    add(f5_tool62.part, mode=Mode.INTERSECT)


with BuildPart() as f1_5:
    add(f1_4.part)

    # F5_t56: cut F5_tool58
    add(f5_tool58_1.part, mode=Mode.SUBTRACT)


solid = f1_5.part
